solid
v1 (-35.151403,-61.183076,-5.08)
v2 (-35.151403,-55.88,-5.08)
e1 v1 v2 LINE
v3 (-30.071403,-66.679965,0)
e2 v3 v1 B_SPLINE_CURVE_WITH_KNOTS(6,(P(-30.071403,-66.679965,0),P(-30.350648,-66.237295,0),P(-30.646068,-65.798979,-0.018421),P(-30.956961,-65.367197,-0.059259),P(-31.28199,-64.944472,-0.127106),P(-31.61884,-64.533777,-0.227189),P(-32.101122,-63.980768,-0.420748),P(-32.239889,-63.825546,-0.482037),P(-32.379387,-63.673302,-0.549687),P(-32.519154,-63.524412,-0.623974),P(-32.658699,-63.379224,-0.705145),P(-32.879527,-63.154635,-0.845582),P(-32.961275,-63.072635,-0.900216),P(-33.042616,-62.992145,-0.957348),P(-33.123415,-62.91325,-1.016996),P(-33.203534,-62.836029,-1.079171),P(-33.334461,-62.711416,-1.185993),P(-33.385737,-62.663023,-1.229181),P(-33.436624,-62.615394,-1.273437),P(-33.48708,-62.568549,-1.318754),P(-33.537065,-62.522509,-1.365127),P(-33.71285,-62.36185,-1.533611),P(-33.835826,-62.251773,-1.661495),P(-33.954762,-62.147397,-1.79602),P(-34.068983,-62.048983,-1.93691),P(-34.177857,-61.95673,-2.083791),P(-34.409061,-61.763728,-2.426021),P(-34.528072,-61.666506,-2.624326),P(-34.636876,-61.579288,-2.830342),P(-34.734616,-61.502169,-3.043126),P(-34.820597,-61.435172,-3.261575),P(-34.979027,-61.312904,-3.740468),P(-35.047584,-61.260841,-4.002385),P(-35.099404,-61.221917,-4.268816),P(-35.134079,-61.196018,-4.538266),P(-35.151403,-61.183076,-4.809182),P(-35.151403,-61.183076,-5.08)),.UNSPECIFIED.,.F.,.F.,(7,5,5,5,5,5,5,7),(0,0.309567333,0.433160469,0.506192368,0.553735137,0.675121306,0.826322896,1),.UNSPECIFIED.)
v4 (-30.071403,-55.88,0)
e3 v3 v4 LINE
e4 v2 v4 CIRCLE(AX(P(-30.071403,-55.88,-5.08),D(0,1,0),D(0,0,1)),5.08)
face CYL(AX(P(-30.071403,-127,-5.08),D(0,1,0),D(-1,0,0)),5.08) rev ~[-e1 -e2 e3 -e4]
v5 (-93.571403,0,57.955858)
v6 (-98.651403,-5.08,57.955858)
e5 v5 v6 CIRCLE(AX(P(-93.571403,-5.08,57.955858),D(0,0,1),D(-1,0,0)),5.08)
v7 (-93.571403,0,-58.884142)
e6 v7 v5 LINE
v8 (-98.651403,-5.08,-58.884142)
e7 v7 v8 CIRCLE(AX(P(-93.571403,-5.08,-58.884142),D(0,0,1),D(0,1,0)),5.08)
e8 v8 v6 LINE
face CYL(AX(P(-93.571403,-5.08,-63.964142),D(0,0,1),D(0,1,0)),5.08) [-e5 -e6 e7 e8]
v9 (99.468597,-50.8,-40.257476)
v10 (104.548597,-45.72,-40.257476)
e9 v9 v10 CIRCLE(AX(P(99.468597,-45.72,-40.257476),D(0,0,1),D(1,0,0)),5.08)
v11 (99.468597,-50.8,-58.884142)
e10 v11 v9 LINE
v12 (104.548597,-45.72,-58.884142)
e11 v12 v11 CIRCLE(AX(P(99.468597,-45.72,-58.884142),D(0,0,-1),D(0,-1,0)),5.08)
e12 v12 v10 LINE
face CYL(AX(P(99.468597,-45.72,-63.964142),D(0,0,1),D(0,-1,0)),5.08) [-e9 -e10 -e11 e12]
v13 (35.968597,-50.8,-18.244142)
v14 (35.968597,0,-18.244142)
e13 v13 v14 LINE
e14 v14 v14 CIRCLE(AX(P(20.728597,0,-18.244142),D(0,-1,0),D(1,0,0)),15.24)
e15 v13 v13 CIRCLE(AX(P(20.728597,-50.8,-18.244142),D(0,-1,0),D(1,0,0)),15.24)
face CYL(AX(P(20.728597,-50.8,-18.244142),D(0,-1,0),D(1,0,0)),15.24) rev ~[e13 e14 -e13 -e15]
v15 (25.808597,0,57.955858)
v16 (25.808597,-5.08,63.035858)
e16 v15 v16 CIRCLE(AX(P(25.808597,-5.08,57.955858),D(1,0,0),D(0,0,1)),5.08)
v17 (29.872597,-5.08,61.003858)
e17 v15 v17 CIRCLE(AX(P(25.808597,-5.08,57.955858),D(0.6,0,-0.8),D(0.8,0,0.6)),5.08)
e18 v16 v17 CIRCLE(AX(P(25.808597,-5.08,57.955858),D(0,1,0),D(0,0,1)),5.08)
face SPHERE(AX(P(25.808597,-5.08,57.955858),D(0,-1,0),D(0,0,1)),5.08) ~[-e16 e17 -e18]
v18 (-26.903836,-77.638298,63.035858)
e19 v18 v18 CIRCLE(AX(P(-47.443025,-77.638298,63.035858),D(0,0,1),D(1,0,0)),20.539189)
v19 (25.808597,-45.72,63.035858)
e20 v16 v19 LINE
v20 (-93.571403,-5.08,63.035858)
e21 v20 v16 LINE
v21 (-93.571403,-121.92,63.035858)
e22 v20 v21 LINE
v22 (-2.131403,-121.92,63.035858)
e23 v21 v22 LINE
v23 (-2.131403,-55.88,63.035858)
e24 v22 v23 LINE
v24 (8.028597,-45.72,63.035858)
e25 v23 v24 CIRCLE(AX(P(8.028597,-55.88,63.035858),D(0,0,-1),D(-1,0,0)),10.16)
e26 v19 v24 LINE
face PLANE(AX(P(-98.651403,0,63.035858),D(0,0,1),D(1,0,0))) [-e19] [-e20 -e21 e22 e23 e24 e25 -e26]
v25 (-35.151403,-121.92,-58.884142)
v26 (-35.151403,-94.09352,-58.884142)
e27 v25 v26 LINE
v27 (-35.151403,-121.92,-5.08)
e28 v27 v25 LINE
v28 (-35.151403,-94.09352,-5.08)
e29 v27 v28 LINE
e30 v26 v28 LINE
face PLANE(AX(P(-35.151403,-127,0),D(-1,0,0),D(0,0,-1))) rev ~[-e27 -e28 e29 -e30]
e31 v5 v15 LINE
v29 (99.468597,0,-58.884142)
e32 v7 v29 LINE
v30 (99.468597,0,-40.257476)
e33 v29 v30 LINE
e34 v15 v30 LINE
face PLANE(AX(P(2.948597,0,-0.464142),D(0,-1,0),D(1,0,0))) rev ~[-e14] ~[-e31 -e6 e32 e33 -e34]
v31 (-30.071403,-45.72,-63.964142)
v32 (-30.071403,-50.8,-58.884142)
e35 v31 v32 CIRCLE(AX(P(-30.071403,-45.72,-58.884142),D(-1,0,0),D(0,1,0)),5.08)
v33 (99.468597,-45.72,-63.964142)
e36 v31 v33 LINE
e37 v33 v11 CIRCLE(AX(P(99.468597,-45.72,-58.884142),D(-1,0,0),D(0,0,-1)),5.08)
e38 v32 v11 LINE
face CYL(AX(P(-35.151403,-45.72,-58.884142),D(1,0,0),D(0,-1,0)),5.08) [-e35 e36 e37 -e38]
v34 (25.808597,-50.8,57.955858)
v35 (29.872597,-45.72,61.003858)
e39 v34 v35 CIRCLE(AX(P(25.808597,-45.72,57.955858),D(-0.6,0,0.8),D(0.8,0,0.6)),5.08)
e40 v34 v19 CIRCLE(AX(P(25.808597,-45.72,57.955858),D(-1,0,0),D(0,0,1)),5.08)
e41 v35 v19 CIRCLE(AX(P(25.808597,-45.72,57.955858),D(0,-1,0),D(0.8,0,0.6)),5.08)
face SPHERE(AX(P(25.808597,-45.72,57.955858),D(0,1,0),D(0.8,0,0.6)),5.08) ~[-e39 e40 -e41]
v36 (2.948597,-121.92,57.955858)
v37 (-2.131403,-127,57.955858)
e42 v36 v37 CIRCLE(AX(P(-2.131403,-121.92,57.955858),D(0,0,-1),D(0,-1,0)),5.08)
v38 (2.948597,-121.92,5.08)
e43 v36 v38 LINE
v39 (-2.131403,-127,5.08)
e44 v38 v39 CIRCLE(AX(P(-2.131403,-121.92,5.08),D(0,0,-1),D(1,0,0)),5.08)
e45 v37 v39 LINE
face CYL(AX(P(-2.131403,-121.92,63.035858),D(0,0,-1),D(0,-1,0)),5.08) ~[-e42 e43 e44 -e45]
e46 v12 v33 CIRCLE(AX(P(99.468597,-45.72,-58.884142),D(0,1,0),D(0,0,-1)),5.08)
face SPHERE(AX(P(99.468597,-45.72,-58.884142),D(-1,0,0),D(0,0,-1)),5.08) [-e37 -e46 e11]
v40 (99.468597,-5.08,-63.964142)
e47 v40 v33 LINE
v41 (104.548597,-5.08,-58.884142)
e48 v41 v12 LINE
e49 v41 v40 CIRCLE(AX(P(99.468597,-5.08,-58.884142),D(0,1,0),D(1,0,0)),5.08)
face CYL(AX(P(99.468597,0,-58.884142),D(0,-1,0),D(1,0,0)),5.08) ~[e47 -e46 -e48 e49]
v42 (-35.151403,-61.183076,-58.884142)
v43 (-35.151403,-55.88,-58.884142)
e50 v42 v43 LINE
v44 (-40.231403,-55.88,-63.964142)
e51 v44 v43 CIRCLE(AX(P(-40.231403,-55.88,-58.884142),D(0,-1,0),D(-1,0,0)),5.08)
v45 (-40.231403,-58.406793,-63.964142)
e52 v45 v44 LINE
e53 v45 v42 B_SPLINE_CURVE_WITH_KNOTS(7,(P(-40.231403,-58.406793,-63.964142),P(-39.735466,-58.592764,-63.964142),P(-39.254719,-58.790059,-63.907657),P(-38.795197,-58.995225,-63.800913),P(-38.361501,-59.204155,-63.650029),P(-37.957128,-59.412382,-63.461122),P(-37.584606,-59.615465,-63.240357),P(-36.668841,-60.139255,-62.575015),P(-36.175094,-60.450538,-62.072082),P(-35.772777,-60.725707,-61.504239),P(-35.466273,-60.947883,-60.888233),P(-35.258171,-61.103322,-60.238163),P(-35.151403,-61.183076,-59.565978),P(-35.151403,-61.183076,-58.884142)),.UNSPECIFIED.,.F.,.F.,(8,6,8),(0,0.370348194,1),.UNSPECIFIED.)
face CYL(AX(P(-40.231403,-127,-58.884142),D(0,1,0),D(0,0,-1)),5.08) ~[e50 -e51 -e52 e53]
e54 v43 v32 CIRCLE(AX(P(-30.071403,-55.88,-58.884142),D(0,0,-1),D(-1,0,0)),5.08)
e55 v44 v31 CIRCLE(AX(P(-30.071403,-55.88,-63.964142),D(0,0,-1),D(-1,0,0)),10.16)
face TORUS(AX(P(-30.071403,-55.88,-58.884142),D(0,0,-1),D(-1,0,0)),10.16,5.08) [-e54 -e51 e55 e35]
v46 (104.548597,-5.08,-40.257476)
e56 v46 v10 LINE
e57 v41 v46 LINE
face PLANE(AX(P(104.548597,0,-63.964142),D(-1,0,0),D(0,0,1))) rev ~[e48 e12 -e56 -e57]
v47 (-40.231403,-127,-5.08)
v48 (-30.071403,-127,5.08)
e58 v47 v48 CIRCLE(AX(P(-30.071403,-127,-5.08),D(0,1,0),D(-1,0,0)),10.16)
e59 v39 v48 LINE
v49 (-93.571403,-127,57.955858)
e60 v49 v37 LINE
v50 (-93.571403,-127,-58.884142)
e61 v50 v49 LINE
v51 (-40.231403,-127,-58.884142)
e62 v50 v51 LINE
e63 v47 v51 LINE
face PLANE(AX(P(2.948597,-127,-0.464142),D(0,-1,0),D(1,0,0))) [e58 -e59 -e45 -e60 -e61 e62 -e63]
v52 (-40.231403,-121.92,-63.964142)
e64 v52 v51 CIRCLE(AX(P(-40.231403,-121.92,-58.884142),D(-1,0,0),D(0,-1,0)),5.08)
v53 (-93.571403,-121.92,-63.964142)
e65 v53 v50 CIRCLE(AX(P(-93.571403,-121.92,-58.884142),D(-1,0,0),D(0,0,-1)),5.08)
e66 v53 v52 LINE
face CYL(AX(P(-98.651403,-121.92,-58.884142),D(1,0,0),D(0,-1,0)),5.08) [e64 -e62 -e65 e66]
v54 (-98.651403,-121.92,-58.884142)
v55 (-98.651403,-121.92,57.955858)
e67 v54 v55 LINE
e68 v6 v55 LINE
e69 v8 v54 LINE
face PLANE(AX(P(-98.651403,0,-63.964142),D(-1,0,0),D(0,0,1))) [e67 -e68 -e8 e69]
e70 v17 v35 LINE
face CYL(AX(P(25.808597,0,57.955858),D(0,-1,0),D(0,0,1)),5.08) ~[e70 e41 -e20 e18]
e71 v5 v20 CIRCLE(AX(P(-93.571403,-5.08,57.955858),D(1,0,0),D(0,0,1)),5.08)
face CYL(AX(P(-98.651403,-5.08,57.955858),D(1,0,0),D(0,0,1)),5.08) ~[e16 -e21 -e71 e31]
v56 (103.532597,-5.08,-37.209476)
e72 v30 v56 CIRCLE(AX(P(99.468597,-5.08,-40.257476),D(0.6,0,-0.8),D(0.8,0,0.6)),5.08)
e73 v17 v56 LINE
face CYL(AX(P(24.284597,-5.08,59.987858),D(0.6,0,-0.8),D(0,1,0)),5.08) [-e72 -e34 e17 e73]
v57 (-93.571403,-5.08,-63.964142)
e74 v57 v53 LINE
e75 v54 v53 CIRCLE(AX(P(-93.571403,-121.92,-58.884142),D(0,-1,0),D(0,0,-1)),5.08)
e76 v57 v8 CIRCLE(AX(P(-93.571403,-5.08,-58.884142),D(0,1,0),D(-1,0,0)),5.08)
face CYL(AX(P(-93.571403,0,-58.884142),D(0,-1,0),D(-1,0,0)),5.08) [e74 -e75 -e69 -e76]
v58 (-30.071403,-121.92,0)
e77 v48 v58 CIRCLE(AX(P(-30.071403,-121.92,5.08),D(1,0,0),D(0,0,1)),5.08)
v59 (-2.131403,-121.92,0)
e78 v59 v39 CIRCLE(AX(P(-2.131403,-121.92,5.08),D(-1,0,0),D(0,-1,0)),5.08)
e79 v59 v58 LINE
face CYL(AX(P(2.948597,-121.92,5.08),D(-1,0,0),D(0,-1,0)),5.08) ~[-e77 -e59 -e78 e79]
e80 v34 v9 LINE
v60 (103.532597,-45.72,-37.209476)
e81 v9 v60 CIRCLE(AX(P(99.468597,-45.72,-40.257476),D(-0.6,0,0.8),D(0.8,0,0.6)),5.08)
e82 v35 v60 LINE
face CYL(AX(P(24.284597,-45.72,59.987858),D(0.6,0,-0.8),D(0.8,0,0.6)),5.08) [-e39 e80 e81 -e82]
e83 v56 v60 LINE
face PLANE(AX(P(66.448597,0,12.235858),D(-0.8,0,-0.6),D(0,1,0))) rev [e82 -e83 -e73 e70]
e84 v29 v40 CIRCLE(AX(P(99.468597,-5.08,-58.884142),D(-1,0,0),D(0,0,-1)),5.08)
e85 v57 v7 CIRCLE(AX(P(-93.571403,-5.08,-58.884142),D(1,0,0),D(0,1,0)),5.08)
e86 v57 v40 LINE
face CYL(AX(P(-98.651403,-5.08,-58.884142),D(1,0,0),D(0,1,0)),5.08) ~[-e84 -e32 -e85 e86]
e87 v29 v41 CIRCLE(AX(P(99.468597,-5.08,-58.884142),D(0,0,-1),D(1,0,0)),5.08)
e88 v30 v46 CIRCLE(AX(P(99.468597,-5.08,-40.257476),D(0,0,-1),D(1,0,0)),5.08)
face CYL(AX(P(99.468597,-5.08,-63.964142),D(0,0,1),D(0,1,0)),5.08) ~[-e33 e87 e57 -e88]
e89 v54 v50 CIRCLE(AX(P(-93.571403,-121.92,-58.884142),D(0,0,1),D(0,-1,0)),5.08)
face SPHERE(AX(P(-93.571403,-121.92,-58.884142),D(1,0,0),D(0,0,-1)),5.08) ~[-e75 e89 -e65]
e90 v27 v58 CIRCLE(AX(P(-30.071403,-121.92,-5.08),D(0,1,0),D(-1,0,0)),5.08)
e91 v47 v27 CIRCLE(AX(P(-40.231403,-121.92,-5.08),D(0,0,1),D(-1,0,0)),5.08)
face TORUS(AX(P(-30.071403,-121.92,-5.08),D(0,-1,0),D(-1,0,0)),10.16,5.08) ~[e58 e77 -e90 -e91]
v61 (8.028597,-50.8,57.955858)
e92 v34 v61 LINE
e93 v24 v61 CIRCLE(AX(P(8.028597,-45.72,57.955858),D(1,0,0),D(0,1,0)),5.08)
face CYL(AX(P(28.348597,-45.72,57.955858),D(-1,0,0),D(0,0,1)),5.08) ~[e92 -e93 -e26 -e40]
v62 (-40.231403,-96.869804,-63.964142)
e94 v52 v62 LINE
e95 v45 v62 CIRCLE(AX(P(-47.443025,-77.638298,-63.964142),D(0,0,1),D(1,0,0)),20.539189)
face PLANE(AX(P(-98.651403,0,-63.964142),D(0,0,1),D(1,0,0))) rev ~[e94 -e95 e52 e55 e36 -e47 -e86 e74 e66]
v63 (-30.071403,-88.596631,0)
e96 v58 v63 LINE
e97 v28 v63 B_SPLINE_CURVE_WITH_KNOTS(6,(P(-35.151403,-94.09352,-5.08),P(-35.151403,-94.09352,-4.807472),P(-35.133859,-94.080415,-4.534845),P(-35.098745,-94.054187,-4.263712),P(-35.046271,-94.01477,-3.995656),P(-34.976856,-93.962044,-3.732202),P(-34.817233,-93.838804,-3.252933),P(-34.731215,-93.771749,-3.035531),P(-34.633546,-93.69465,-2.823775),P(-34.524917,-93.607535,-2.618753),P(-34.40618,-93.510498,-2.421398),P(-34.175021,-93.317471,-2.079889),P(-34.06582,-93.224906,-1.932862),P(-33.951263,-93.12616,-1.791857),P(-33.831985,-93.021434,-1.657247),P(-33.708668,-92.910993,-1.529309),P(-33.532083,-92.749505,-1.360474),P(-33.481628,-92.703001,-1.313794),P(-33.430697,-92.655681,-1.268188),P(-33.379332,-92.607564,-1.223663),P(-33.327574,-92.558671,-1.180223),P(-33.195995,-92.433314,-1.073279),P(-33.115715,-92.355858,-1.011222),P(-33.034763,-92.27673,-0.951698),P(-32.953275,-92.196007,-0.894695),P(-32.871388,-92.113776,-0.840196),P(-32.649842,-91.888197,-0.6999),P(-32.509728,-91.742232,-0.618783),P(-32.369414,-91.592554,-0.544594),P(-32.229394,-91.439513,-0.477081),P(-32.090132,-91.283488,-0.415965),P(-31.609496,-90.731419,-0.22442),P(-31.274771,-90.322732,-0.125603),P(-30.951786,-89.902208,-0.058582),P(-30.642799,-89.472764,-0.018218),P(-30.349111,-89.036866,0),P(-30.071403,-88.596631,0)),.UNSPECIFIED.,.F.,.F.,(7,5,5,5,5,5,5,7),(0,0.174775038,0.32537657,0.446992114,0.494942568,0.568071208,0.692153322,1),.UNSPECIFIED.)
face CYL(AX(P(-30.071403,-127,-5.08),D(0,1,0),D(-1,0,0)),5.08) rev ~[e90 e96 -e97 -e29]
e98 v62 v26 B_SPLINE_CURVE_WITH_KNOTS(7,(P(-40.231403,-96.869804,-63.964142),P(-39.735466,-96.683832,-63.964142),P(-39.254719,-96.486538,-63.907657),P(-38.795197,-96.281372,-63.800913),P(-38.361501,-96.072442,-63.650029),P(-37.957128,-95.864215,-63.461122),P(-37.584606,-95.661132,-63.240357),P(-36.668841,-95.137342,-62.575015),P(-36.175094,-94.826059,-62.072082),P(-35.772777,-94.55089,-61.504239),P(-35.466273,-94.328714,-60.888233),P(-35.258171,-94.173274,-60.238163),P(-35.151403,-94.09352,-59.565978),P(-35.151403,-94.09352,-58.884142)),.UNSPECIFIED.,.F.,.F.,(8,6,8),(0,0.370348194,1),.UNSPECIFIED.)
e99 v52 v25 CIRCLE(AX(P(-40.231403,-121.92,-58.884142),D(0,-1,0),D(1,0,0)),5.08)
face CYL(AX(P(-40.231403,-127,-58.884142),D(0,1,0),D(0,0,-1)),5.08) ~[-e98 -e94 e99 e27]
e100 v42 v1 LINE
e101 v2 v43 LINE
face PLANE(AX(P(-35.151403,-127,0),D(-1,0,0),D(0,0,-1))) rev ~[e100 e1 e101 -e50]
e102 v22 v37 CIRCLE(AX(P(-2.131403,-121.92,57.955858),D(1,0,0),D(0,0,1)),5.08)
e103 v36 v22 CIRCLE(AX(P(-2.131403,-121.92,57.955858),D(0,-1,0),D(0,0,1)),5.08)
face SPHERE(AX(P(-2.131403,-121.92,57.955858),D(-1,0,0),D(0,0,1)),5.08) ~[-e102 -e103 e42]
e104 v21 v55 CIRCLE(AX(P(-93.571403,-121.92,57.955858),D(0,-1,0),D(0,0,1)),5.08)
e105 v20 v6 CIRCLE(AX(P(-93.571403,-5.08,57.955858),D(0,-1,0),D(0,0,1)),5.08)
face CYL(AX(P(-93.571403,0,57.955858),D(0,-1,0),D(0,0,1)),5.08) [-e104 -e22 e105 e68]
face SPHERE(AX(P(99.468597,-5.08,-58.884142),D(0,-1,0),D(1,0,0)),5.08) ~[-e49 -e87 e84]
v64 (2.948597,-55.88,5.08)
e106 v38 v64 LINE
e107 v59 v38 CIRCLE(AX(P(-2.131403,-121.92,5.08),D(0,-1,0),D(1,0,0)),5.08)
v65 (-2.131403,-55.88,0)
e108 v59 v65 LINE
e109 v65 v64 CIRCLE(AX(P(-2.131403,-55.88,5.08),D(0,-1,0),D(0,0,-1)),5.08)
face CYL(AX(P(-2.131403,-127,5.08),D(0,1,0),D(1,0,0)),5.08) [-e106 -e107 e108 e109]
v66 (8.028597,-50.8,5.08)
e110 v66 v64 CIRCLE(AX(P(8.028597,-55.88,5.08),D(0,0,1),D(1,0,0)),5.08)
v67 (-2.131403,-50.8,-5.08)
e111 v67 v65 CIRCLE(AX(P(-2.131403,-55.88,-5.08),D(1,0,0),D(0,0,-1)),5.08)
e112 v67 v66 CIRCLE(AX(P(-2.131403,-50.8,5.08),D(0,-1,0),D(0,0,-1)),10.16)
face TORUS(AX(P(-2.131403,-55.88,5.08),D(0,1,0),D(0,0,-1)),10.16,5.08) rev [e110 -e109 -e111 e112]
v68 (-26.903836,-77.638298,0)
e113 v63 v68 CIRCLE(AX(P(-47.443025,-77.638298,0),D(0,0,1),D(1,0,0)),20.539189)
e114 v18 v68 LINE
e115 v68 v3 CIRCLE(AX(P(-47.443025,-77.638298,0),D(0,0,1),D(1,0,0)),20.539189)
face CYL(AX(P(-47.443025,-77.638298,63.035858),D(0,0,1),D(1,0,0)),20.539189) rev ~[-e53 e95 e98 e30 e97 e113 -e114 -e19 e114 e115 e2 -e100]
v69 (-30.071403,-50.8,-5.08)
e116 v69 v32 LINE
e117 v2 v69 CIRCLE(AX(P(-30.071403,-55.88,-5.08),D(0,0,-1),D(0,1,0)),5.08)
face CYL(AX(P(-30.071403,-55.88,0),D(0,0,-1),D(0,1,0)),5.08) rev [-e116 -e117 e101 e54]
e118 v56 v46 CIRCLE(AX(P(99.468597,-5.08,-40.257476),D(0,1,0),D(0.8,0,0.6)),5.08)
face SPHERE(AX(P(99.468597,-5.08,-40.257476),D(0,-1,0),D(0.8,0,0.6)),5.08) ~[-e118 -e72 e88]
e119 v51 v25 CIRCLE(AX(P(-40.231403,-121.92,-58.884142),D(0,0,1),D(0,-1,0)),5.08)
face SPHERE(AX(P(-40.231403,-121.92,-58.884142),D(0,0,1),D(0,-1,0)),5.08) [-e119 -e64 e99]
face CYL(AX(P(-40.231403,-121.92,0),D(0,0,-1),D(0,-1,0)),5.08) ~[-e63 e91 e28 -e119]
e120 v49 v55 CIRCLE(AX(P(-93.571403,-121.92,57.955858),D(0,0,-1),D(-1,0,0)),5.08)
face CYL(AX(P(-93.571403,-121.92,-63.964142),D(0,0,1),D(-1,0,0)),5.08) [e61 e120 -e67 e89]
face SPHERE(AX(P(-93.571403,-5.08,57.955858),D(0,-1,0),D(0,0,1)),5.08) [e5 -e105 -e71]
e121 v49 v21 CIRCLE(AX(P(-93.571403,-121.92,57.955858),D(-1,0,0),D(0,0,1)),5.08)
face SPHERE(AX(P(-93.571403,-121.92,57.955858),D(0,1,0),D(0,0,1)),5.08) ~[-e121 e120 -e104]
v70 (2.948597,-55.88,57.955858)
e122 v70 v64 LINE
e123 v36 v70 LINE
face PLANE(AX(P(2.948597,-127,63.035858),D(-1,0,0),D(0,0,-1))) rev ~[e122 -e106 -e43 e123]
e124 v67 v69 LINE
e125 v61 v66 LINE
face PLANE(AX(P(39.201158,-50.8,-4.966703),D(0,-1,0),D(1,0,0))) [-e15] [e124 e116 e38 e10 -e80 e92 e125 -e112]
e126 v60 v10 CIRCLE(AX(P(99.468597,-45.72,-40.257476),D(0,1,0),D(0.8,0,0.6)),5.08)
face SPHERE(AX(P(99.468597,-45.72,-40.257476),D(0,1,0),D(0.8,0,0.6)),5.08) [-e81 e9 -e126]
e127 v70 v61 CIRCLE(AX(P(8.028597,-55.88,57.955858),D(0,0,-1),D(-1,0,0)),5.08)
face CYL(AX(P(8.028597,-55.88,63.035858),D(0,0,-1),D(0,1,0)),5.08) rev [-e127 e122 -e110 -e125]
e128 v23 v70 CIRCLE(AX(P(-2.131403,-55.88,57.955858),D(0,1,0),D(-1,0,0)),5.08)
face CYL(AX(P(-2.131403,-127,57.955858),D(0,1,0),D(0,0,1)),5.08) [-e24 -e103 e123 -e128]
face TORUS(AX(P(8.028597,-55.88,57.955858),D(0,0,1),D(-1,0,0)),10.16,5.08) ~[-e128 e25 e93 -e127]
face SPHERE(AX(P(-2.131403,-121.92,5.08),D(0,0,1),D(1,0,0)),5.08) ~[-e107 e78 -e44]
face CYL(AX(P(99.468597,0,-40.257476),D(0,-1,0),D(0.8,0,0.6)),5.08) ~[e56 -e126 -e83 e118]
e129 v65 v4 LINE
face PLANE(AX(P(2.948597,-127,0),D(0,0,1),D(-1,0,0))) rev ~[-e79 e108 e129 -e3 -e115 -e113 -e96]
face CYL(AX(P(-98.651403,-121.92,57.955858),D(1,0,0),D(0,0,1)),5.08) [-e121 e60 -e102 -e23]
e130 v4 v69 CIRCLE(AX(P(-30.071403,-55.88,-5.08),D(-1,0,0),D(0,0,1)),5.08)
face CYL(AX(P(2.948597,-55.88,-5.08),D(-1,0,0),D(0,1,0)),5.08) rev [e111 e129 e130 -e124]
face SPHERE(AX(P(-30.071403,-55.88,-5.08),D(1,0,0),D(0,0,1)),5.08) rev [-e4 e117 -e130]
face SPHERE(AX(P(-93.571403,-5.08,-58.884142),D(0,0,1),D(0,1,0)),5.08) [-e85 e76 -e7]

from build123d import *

# Parameters (mm, degrees)
F0_W     = 203.2
F0_H     = 127
F1_DEPTH = 127
F3_DEPTH = 76.2
F4_SIZE2 = 101.6
F4_SIZE  = 76.2
F5_R     = 5.08
F6_R     = 15.24
F7_DEPTH = 50.8
F8_R     = 20.5391892085
F9_DEPTH = 127


with BuildPart() as f1:
    # F0 (on Front) → F1 (new body)
    with BuildSketch(Plane.XZ):
        with Locations((2.9485966027, -0.464142194)):
            Rectangle(F0_W, F0_H)
    extrude(amount=F1_DEPTH)

    # F2 (on face) → F3 (cut)
    with BuildSketch(Plane.XZ.offset(127)):
        Polygon((-35.1514033973, 0), (-35.1514033973, -63.964142194), (104.5485966027, -63.964142194), (104.5485966027, 63.035857806), (2.9485966027, 63.035857806), (2.9485966027, 0), align=None)
    extrude(amount=-F3_DEPTH, mode=Mode.SUBTRACT)

    # F4
    f4_edges = [f1.edges().sort_by_distance(p)[0] for p in [
        (104.548597, -25.4, 63.035858),
    ]]
    f4_side = f1.faces().sort_by_distance((-18.822832, -52.614286, 63.035858))[0]
    chamfer(f4_edges, length=F4_SIZE, length2=F4_SIZE2, reference=f4_side)

    # F5
    f5_edges = [f1.edges().sort_by_distance(p)[0] for p in [
        (-98.651403, -63.5, 63.035858),
        (-47.851403, -127, 63.035858),
        (2.948597, -88.9, 63.035858),
        (15.648597, -50.8, 63.035858),
        (28.348597, -25.4, 63.035858),
        (-35.151403, 0, 63.035858),
        (2.948597, -127, 31.517929),
        (2.948597, -88.9, 0),
        (-35.151403, -127, -31.982071),
        (-16.101403, -127, 0),
        (-16.101403, -50.8, 0),
        (-35.151403, -88.9, 0),
        (-35.151403, -50.8, -31.982071),
        (-66.901403, -127, -63.964142),
        (-35.151403, -88.9, -63.964142),
        (34.698597, -50.8, -63.964142),
        (104.548597, -25.4, -63.964142),
        (104.548597, -50.8, -51.264142),
        (104.548597, 0, -51.264142),
        (104.548597, -25.4, -38.564142),
        (66.448597, 0, 12.235858),
        (66.448597, -50.8, 12.235858),
        (-98.651403, 0, -0.464142),
        (2.948597, 0, -63.964142),
        (-98.651403, -63.5, -63.964142),
        (-98.651403, -127, -0.464142),
        (2.948597, -50.8, 31.517929),
    ]]
    fillet(f5_edges, radius=F5_R)

    # F6 (on face) → F7 (cut, through all)
    with BuildSketch(Plane.XZ.offset(50.8)):
        with Locations((20.7285966027, -18.244142194)):
            Circle(F6_R)
    extrude(amount=-F7_DEPTH, mode=Mode.SUBTRACT)

    # F8 (on face) → F9 (cut, through all)
    with BuildSketch(Plane.XY.offset(63.035857806)):
        with Locations((-47.4430248141, -77.6382982731)):
            Circle(F8_R)
    extrude(amount=-F9_DEPTH, mode=Mode.SUBTRACT)


solid = f1.part
